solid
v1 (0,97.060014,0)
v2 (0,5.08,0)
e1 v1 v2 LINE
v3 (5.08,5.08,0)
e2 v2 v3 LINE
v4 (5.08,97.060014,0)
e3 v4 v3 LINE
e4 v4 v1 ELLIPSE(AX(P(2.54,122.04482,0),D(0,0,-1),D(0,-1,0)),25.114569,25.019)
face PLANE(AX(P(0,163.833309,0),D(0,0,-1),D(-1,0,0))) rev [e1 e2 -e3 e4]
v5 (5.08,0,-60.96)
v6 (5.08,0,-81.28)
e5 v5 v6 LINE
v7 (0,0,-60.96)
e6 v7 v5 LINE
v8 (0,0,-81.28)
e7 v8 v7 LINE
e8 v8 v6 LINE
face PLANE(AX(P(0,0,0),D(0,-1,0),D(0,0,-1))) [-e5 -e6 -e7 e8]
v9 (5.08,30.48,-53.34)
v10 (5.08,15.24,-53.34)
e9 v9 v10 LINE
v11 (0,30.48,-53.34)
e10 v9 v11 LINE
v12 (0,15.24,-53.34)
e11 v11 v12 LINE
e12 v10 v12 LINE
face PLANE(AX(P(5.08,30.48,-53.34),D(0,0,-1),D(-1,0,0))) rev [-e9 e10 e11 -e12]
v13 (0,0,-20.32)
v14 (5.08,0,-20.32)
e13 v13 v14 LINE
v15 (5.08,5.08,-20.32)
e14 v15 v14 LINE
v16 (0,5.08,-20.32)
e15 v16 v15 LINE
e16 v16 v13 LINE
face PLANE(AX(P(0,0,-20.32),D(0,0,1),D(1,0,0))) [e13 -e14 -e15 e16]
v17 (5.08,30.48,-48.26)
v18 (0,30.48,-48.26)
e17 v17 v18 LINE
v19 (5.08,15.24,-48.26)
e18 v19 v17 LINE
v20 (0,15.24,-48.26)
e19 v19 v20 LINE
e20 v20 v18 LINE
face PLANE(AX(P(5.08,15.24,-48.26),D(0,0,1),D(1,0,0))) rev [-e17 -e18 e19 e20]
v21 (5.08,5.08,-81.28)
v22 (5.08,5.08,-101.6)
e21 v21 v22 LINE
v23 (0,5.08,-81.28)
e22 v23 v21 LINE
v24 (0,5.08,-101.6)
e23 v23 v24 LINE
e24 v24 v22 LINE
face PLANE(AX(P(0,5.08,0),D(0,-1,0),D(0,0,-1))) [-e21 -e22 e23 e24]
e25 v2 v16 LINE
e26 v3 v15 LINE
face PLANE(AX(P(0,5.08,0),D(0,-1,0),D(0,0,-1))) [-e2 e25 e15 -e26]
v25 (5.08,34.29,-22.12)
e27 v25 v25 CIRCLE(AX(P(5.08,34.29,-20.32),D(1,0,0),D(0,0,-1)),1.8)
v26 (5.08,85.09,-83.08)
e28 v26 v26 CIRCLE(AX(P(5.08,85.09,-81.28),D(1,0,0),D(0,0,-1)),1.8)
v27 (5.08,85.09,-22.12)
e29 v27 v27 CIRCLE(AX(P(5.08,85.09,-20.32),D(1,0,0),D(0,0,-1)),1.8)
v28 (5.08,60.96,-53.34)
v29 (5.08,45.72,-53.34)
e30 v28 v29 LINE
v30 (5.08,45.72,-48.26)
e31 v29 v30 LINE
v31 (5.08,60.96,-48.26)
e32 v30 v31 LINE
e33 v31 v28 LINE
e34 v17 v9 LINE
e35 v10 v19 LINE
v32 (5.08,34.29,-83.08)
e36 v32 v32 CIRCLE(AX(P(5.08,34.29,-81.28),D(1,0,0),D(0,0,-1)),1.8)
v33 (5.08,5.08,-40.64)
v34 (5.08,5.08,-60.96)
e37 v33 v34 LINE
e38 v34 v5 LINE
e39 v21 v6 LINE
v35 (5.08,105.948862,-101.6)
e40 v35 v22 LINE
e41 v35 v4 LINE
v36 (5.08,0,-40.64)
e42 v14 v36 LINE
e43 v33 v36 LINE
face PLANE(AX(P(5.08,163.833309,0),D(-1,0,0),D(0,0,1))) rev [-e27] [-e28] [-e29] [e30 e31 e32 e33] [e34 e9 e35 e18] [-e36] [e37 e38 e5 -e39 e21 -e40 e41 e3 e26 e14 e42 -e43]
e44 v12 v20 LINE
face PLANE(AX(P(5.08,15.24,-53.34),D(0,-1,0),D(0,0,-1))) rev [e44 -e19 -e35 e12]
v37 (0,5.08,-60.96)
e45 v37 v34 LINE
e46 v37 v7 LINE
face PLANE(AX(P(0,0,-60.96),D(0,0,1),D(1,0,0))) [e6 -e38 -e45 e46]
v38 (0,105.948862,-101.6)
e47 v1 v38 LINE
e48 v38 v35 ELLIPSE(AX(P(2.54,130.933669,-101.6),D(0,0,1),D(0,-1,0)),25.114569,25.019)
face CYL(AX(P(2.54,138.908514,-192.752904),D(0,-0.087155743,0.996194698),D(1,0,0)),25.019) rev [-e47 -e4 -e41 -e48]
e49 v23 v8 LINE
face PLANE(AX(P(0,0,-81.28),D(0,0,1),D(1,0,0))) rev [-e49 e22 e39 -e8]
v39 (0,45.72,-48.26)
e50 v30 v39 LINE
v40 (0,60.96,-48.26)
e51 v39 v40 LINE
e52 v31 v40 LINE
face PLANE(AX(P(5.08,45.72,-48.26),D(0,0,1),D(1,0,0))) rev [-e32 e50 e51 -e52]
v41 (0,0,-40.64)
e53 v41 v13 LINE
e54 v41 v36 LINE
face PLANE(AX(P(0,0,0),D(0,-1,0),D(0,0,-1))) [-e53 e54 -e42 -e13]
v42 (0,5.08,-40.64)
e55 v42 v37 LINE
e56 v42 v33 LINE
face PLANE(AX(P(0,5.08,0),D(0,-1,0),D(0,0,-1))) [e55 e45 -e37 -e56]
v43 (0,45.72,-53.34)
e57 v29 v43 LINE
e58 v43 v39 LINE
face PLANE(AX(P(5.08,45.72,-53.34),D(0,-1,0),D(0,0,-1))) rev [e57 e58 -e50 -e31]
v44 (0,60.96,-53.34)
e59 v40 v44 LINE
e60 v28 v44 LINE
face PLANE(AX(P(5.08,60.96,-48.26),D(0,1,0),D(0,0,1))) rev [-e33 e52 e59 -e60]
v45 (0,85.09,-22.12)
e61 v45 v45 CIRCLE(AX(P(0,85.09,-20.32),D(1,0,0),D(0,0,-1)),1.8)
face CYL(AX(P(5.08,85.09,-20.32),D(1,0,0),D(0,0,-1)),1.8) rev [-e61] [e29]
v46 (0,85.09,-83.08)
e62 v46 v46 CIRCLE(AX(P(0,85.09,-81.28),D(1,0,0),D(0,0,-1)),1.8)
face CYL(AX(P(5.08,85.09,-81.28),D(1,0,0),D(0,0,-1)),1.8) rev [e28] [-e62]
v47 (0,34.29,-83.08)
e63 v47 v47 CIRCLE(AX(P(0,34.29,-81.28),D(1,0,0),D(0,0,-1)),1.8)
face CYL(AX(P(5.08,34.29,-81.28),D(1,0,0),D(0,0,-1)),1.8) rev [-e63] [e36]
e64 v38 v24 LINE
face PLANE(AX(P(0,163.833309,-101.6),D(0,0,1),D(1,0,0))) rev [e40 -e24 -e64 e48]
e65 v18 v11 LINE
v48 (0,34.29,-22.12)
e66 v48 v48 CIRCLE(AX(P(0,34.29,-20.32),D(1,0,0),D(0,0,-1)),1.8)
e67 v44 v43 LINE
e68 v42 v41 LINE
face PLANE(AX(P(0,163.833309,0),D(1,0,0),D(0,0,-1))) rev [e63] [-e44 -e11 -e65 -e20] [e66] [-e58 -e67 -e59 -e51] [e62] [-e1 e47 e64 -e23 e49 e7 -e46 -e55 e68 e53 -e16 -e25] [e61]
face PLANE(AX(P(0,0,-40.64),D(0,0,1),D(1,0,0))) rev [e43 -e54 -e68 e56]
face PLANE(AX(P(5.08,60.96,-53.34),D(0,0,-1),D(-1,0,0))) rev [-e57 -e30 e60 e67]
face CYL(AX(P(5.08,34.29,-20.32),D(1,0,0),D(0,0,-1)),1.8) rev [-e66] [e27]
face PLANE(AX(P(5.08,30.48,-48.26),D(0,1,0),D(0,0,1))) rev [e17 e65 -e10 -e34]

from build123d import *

# Parameters (mm, degrees)
BOSS_EXTRUDE1_OUTLINE_W = 5.08
BOSS_EXTRUDE1_OUTLINE_H = 101.6
BOSS_EXTRUDE1_DEPTH     = 105.948861845
BOSS_EXTRUDE1_START     = 7
BOSS_EXTRUDE1_2_DEPTH   = 104
M3_CLEARANCE_HOLE1_D    = 3.6
SKETCH12_W              = 20.32
SKETCH12_H              = 5.08
CUT_EXTRUDE1_DEPTH      = 147.879296452
SKETCH13_W              = 5.08
SKETCH13_H              = 15.24
CUT_EXTRUDE2_DEPTH      = 147.879296452


with BuildPart() as part:
    # Boss-Extrude1: read off the stored shape, not the designer's step
    # Boss-Extrude1 outline → Boss-Extrude1 (new body)
    with BuildSketch(Plane(origin=(0, 0, 0), x_dir=(1, 0, 0), z_dir=(0, 1, 0))):
        with Locations((2.54, 50.8)):
            Rectangle(BOSS_EXTRUDE1_OUTLINE_W, BOSS_EXTRUDE1_OUTLINE_H)
    extrude(amount=BOSS_EXTRUDE1_DEPTH)

    # Boss-Extrude1 2 outline → Boss-Extrude1 2 (cut)
    with BuildSketch(Plane(origin=(0, 0, 0), x_dir=(1, 0, 0), z_dir=(0, 0.08715574274764448, -0.9961946980917468)).offset(BOSS_EXTRUDE1_START)):
        with BuildLine():
            ThreePointArc((5.08, -96.690670975), (2.54, -96.561403015), (0, -96.690670975))
            Line((0, -96.690670975), (-2, -96.894771203))
            Line((-2, -96.894771203), (-2, -107))
            Line((-2, -107), (7, -107))
            Line((7, -107), (7, -96.886607194))
            Line((7, -96.886607194), (5.08, -96.690670975))
        make_face()
    extrude(amount=BOSS_EXTRUDE1_2_DEPTH, mode=Mode.SUBTRACT)

    # M3 Clearance Hole1 (through all)
    with Locations(Plane(origin=(5.08, 0, 0), x_dir=(0, 0, -1), z_dir=(1, 0, 0))):
        with Locations((81.28, 85.09), (20.32, 85.09), (20.32, 34.29), (81.28, 34.29)):
            Hole(M3_CLEARANCE_HOLE1_D / 2)

    # Sketch12 → Cut-Extrude1 (cut, through all)
    with BuildSketch(Plane(origin=(5.08, 0, 0), x_dir=(0, 0, -1), z_dir=(1, 0, 0))):
        with Locations((91.44, 2.54)):
            Rectangle(SKETCH12_W, SKETCH12_H)
        with Locations((50.8, 2.54)):
            Rectangle(SKETCH12_W, SKETCH12_H)
        with Locations((10.16, 2.54)):
            Rectangle(SKETCH12_W, SKETCH12_H)
    extrude(amount=-CUT_EXTRUDE1_DEPTH, mode=Mode.SUBTRACT)

    # Sketch13 → Cut-Extrude2 (cut, through all)
    with BuildSketch(Plane.ZY):
        with Locations((-50.8, 53.34)):
            Rectangle(SKETCH13_W, SKETCH13_H)
        with Locations((-50.8, 22.86)):
            Rectangle(SKETCH13_W, SKETCH13_H)
    extrude(amount=-CUT_EXTRUDE2_DEPTH, mode=Mode.SUBTRACT)


solid = part.part
